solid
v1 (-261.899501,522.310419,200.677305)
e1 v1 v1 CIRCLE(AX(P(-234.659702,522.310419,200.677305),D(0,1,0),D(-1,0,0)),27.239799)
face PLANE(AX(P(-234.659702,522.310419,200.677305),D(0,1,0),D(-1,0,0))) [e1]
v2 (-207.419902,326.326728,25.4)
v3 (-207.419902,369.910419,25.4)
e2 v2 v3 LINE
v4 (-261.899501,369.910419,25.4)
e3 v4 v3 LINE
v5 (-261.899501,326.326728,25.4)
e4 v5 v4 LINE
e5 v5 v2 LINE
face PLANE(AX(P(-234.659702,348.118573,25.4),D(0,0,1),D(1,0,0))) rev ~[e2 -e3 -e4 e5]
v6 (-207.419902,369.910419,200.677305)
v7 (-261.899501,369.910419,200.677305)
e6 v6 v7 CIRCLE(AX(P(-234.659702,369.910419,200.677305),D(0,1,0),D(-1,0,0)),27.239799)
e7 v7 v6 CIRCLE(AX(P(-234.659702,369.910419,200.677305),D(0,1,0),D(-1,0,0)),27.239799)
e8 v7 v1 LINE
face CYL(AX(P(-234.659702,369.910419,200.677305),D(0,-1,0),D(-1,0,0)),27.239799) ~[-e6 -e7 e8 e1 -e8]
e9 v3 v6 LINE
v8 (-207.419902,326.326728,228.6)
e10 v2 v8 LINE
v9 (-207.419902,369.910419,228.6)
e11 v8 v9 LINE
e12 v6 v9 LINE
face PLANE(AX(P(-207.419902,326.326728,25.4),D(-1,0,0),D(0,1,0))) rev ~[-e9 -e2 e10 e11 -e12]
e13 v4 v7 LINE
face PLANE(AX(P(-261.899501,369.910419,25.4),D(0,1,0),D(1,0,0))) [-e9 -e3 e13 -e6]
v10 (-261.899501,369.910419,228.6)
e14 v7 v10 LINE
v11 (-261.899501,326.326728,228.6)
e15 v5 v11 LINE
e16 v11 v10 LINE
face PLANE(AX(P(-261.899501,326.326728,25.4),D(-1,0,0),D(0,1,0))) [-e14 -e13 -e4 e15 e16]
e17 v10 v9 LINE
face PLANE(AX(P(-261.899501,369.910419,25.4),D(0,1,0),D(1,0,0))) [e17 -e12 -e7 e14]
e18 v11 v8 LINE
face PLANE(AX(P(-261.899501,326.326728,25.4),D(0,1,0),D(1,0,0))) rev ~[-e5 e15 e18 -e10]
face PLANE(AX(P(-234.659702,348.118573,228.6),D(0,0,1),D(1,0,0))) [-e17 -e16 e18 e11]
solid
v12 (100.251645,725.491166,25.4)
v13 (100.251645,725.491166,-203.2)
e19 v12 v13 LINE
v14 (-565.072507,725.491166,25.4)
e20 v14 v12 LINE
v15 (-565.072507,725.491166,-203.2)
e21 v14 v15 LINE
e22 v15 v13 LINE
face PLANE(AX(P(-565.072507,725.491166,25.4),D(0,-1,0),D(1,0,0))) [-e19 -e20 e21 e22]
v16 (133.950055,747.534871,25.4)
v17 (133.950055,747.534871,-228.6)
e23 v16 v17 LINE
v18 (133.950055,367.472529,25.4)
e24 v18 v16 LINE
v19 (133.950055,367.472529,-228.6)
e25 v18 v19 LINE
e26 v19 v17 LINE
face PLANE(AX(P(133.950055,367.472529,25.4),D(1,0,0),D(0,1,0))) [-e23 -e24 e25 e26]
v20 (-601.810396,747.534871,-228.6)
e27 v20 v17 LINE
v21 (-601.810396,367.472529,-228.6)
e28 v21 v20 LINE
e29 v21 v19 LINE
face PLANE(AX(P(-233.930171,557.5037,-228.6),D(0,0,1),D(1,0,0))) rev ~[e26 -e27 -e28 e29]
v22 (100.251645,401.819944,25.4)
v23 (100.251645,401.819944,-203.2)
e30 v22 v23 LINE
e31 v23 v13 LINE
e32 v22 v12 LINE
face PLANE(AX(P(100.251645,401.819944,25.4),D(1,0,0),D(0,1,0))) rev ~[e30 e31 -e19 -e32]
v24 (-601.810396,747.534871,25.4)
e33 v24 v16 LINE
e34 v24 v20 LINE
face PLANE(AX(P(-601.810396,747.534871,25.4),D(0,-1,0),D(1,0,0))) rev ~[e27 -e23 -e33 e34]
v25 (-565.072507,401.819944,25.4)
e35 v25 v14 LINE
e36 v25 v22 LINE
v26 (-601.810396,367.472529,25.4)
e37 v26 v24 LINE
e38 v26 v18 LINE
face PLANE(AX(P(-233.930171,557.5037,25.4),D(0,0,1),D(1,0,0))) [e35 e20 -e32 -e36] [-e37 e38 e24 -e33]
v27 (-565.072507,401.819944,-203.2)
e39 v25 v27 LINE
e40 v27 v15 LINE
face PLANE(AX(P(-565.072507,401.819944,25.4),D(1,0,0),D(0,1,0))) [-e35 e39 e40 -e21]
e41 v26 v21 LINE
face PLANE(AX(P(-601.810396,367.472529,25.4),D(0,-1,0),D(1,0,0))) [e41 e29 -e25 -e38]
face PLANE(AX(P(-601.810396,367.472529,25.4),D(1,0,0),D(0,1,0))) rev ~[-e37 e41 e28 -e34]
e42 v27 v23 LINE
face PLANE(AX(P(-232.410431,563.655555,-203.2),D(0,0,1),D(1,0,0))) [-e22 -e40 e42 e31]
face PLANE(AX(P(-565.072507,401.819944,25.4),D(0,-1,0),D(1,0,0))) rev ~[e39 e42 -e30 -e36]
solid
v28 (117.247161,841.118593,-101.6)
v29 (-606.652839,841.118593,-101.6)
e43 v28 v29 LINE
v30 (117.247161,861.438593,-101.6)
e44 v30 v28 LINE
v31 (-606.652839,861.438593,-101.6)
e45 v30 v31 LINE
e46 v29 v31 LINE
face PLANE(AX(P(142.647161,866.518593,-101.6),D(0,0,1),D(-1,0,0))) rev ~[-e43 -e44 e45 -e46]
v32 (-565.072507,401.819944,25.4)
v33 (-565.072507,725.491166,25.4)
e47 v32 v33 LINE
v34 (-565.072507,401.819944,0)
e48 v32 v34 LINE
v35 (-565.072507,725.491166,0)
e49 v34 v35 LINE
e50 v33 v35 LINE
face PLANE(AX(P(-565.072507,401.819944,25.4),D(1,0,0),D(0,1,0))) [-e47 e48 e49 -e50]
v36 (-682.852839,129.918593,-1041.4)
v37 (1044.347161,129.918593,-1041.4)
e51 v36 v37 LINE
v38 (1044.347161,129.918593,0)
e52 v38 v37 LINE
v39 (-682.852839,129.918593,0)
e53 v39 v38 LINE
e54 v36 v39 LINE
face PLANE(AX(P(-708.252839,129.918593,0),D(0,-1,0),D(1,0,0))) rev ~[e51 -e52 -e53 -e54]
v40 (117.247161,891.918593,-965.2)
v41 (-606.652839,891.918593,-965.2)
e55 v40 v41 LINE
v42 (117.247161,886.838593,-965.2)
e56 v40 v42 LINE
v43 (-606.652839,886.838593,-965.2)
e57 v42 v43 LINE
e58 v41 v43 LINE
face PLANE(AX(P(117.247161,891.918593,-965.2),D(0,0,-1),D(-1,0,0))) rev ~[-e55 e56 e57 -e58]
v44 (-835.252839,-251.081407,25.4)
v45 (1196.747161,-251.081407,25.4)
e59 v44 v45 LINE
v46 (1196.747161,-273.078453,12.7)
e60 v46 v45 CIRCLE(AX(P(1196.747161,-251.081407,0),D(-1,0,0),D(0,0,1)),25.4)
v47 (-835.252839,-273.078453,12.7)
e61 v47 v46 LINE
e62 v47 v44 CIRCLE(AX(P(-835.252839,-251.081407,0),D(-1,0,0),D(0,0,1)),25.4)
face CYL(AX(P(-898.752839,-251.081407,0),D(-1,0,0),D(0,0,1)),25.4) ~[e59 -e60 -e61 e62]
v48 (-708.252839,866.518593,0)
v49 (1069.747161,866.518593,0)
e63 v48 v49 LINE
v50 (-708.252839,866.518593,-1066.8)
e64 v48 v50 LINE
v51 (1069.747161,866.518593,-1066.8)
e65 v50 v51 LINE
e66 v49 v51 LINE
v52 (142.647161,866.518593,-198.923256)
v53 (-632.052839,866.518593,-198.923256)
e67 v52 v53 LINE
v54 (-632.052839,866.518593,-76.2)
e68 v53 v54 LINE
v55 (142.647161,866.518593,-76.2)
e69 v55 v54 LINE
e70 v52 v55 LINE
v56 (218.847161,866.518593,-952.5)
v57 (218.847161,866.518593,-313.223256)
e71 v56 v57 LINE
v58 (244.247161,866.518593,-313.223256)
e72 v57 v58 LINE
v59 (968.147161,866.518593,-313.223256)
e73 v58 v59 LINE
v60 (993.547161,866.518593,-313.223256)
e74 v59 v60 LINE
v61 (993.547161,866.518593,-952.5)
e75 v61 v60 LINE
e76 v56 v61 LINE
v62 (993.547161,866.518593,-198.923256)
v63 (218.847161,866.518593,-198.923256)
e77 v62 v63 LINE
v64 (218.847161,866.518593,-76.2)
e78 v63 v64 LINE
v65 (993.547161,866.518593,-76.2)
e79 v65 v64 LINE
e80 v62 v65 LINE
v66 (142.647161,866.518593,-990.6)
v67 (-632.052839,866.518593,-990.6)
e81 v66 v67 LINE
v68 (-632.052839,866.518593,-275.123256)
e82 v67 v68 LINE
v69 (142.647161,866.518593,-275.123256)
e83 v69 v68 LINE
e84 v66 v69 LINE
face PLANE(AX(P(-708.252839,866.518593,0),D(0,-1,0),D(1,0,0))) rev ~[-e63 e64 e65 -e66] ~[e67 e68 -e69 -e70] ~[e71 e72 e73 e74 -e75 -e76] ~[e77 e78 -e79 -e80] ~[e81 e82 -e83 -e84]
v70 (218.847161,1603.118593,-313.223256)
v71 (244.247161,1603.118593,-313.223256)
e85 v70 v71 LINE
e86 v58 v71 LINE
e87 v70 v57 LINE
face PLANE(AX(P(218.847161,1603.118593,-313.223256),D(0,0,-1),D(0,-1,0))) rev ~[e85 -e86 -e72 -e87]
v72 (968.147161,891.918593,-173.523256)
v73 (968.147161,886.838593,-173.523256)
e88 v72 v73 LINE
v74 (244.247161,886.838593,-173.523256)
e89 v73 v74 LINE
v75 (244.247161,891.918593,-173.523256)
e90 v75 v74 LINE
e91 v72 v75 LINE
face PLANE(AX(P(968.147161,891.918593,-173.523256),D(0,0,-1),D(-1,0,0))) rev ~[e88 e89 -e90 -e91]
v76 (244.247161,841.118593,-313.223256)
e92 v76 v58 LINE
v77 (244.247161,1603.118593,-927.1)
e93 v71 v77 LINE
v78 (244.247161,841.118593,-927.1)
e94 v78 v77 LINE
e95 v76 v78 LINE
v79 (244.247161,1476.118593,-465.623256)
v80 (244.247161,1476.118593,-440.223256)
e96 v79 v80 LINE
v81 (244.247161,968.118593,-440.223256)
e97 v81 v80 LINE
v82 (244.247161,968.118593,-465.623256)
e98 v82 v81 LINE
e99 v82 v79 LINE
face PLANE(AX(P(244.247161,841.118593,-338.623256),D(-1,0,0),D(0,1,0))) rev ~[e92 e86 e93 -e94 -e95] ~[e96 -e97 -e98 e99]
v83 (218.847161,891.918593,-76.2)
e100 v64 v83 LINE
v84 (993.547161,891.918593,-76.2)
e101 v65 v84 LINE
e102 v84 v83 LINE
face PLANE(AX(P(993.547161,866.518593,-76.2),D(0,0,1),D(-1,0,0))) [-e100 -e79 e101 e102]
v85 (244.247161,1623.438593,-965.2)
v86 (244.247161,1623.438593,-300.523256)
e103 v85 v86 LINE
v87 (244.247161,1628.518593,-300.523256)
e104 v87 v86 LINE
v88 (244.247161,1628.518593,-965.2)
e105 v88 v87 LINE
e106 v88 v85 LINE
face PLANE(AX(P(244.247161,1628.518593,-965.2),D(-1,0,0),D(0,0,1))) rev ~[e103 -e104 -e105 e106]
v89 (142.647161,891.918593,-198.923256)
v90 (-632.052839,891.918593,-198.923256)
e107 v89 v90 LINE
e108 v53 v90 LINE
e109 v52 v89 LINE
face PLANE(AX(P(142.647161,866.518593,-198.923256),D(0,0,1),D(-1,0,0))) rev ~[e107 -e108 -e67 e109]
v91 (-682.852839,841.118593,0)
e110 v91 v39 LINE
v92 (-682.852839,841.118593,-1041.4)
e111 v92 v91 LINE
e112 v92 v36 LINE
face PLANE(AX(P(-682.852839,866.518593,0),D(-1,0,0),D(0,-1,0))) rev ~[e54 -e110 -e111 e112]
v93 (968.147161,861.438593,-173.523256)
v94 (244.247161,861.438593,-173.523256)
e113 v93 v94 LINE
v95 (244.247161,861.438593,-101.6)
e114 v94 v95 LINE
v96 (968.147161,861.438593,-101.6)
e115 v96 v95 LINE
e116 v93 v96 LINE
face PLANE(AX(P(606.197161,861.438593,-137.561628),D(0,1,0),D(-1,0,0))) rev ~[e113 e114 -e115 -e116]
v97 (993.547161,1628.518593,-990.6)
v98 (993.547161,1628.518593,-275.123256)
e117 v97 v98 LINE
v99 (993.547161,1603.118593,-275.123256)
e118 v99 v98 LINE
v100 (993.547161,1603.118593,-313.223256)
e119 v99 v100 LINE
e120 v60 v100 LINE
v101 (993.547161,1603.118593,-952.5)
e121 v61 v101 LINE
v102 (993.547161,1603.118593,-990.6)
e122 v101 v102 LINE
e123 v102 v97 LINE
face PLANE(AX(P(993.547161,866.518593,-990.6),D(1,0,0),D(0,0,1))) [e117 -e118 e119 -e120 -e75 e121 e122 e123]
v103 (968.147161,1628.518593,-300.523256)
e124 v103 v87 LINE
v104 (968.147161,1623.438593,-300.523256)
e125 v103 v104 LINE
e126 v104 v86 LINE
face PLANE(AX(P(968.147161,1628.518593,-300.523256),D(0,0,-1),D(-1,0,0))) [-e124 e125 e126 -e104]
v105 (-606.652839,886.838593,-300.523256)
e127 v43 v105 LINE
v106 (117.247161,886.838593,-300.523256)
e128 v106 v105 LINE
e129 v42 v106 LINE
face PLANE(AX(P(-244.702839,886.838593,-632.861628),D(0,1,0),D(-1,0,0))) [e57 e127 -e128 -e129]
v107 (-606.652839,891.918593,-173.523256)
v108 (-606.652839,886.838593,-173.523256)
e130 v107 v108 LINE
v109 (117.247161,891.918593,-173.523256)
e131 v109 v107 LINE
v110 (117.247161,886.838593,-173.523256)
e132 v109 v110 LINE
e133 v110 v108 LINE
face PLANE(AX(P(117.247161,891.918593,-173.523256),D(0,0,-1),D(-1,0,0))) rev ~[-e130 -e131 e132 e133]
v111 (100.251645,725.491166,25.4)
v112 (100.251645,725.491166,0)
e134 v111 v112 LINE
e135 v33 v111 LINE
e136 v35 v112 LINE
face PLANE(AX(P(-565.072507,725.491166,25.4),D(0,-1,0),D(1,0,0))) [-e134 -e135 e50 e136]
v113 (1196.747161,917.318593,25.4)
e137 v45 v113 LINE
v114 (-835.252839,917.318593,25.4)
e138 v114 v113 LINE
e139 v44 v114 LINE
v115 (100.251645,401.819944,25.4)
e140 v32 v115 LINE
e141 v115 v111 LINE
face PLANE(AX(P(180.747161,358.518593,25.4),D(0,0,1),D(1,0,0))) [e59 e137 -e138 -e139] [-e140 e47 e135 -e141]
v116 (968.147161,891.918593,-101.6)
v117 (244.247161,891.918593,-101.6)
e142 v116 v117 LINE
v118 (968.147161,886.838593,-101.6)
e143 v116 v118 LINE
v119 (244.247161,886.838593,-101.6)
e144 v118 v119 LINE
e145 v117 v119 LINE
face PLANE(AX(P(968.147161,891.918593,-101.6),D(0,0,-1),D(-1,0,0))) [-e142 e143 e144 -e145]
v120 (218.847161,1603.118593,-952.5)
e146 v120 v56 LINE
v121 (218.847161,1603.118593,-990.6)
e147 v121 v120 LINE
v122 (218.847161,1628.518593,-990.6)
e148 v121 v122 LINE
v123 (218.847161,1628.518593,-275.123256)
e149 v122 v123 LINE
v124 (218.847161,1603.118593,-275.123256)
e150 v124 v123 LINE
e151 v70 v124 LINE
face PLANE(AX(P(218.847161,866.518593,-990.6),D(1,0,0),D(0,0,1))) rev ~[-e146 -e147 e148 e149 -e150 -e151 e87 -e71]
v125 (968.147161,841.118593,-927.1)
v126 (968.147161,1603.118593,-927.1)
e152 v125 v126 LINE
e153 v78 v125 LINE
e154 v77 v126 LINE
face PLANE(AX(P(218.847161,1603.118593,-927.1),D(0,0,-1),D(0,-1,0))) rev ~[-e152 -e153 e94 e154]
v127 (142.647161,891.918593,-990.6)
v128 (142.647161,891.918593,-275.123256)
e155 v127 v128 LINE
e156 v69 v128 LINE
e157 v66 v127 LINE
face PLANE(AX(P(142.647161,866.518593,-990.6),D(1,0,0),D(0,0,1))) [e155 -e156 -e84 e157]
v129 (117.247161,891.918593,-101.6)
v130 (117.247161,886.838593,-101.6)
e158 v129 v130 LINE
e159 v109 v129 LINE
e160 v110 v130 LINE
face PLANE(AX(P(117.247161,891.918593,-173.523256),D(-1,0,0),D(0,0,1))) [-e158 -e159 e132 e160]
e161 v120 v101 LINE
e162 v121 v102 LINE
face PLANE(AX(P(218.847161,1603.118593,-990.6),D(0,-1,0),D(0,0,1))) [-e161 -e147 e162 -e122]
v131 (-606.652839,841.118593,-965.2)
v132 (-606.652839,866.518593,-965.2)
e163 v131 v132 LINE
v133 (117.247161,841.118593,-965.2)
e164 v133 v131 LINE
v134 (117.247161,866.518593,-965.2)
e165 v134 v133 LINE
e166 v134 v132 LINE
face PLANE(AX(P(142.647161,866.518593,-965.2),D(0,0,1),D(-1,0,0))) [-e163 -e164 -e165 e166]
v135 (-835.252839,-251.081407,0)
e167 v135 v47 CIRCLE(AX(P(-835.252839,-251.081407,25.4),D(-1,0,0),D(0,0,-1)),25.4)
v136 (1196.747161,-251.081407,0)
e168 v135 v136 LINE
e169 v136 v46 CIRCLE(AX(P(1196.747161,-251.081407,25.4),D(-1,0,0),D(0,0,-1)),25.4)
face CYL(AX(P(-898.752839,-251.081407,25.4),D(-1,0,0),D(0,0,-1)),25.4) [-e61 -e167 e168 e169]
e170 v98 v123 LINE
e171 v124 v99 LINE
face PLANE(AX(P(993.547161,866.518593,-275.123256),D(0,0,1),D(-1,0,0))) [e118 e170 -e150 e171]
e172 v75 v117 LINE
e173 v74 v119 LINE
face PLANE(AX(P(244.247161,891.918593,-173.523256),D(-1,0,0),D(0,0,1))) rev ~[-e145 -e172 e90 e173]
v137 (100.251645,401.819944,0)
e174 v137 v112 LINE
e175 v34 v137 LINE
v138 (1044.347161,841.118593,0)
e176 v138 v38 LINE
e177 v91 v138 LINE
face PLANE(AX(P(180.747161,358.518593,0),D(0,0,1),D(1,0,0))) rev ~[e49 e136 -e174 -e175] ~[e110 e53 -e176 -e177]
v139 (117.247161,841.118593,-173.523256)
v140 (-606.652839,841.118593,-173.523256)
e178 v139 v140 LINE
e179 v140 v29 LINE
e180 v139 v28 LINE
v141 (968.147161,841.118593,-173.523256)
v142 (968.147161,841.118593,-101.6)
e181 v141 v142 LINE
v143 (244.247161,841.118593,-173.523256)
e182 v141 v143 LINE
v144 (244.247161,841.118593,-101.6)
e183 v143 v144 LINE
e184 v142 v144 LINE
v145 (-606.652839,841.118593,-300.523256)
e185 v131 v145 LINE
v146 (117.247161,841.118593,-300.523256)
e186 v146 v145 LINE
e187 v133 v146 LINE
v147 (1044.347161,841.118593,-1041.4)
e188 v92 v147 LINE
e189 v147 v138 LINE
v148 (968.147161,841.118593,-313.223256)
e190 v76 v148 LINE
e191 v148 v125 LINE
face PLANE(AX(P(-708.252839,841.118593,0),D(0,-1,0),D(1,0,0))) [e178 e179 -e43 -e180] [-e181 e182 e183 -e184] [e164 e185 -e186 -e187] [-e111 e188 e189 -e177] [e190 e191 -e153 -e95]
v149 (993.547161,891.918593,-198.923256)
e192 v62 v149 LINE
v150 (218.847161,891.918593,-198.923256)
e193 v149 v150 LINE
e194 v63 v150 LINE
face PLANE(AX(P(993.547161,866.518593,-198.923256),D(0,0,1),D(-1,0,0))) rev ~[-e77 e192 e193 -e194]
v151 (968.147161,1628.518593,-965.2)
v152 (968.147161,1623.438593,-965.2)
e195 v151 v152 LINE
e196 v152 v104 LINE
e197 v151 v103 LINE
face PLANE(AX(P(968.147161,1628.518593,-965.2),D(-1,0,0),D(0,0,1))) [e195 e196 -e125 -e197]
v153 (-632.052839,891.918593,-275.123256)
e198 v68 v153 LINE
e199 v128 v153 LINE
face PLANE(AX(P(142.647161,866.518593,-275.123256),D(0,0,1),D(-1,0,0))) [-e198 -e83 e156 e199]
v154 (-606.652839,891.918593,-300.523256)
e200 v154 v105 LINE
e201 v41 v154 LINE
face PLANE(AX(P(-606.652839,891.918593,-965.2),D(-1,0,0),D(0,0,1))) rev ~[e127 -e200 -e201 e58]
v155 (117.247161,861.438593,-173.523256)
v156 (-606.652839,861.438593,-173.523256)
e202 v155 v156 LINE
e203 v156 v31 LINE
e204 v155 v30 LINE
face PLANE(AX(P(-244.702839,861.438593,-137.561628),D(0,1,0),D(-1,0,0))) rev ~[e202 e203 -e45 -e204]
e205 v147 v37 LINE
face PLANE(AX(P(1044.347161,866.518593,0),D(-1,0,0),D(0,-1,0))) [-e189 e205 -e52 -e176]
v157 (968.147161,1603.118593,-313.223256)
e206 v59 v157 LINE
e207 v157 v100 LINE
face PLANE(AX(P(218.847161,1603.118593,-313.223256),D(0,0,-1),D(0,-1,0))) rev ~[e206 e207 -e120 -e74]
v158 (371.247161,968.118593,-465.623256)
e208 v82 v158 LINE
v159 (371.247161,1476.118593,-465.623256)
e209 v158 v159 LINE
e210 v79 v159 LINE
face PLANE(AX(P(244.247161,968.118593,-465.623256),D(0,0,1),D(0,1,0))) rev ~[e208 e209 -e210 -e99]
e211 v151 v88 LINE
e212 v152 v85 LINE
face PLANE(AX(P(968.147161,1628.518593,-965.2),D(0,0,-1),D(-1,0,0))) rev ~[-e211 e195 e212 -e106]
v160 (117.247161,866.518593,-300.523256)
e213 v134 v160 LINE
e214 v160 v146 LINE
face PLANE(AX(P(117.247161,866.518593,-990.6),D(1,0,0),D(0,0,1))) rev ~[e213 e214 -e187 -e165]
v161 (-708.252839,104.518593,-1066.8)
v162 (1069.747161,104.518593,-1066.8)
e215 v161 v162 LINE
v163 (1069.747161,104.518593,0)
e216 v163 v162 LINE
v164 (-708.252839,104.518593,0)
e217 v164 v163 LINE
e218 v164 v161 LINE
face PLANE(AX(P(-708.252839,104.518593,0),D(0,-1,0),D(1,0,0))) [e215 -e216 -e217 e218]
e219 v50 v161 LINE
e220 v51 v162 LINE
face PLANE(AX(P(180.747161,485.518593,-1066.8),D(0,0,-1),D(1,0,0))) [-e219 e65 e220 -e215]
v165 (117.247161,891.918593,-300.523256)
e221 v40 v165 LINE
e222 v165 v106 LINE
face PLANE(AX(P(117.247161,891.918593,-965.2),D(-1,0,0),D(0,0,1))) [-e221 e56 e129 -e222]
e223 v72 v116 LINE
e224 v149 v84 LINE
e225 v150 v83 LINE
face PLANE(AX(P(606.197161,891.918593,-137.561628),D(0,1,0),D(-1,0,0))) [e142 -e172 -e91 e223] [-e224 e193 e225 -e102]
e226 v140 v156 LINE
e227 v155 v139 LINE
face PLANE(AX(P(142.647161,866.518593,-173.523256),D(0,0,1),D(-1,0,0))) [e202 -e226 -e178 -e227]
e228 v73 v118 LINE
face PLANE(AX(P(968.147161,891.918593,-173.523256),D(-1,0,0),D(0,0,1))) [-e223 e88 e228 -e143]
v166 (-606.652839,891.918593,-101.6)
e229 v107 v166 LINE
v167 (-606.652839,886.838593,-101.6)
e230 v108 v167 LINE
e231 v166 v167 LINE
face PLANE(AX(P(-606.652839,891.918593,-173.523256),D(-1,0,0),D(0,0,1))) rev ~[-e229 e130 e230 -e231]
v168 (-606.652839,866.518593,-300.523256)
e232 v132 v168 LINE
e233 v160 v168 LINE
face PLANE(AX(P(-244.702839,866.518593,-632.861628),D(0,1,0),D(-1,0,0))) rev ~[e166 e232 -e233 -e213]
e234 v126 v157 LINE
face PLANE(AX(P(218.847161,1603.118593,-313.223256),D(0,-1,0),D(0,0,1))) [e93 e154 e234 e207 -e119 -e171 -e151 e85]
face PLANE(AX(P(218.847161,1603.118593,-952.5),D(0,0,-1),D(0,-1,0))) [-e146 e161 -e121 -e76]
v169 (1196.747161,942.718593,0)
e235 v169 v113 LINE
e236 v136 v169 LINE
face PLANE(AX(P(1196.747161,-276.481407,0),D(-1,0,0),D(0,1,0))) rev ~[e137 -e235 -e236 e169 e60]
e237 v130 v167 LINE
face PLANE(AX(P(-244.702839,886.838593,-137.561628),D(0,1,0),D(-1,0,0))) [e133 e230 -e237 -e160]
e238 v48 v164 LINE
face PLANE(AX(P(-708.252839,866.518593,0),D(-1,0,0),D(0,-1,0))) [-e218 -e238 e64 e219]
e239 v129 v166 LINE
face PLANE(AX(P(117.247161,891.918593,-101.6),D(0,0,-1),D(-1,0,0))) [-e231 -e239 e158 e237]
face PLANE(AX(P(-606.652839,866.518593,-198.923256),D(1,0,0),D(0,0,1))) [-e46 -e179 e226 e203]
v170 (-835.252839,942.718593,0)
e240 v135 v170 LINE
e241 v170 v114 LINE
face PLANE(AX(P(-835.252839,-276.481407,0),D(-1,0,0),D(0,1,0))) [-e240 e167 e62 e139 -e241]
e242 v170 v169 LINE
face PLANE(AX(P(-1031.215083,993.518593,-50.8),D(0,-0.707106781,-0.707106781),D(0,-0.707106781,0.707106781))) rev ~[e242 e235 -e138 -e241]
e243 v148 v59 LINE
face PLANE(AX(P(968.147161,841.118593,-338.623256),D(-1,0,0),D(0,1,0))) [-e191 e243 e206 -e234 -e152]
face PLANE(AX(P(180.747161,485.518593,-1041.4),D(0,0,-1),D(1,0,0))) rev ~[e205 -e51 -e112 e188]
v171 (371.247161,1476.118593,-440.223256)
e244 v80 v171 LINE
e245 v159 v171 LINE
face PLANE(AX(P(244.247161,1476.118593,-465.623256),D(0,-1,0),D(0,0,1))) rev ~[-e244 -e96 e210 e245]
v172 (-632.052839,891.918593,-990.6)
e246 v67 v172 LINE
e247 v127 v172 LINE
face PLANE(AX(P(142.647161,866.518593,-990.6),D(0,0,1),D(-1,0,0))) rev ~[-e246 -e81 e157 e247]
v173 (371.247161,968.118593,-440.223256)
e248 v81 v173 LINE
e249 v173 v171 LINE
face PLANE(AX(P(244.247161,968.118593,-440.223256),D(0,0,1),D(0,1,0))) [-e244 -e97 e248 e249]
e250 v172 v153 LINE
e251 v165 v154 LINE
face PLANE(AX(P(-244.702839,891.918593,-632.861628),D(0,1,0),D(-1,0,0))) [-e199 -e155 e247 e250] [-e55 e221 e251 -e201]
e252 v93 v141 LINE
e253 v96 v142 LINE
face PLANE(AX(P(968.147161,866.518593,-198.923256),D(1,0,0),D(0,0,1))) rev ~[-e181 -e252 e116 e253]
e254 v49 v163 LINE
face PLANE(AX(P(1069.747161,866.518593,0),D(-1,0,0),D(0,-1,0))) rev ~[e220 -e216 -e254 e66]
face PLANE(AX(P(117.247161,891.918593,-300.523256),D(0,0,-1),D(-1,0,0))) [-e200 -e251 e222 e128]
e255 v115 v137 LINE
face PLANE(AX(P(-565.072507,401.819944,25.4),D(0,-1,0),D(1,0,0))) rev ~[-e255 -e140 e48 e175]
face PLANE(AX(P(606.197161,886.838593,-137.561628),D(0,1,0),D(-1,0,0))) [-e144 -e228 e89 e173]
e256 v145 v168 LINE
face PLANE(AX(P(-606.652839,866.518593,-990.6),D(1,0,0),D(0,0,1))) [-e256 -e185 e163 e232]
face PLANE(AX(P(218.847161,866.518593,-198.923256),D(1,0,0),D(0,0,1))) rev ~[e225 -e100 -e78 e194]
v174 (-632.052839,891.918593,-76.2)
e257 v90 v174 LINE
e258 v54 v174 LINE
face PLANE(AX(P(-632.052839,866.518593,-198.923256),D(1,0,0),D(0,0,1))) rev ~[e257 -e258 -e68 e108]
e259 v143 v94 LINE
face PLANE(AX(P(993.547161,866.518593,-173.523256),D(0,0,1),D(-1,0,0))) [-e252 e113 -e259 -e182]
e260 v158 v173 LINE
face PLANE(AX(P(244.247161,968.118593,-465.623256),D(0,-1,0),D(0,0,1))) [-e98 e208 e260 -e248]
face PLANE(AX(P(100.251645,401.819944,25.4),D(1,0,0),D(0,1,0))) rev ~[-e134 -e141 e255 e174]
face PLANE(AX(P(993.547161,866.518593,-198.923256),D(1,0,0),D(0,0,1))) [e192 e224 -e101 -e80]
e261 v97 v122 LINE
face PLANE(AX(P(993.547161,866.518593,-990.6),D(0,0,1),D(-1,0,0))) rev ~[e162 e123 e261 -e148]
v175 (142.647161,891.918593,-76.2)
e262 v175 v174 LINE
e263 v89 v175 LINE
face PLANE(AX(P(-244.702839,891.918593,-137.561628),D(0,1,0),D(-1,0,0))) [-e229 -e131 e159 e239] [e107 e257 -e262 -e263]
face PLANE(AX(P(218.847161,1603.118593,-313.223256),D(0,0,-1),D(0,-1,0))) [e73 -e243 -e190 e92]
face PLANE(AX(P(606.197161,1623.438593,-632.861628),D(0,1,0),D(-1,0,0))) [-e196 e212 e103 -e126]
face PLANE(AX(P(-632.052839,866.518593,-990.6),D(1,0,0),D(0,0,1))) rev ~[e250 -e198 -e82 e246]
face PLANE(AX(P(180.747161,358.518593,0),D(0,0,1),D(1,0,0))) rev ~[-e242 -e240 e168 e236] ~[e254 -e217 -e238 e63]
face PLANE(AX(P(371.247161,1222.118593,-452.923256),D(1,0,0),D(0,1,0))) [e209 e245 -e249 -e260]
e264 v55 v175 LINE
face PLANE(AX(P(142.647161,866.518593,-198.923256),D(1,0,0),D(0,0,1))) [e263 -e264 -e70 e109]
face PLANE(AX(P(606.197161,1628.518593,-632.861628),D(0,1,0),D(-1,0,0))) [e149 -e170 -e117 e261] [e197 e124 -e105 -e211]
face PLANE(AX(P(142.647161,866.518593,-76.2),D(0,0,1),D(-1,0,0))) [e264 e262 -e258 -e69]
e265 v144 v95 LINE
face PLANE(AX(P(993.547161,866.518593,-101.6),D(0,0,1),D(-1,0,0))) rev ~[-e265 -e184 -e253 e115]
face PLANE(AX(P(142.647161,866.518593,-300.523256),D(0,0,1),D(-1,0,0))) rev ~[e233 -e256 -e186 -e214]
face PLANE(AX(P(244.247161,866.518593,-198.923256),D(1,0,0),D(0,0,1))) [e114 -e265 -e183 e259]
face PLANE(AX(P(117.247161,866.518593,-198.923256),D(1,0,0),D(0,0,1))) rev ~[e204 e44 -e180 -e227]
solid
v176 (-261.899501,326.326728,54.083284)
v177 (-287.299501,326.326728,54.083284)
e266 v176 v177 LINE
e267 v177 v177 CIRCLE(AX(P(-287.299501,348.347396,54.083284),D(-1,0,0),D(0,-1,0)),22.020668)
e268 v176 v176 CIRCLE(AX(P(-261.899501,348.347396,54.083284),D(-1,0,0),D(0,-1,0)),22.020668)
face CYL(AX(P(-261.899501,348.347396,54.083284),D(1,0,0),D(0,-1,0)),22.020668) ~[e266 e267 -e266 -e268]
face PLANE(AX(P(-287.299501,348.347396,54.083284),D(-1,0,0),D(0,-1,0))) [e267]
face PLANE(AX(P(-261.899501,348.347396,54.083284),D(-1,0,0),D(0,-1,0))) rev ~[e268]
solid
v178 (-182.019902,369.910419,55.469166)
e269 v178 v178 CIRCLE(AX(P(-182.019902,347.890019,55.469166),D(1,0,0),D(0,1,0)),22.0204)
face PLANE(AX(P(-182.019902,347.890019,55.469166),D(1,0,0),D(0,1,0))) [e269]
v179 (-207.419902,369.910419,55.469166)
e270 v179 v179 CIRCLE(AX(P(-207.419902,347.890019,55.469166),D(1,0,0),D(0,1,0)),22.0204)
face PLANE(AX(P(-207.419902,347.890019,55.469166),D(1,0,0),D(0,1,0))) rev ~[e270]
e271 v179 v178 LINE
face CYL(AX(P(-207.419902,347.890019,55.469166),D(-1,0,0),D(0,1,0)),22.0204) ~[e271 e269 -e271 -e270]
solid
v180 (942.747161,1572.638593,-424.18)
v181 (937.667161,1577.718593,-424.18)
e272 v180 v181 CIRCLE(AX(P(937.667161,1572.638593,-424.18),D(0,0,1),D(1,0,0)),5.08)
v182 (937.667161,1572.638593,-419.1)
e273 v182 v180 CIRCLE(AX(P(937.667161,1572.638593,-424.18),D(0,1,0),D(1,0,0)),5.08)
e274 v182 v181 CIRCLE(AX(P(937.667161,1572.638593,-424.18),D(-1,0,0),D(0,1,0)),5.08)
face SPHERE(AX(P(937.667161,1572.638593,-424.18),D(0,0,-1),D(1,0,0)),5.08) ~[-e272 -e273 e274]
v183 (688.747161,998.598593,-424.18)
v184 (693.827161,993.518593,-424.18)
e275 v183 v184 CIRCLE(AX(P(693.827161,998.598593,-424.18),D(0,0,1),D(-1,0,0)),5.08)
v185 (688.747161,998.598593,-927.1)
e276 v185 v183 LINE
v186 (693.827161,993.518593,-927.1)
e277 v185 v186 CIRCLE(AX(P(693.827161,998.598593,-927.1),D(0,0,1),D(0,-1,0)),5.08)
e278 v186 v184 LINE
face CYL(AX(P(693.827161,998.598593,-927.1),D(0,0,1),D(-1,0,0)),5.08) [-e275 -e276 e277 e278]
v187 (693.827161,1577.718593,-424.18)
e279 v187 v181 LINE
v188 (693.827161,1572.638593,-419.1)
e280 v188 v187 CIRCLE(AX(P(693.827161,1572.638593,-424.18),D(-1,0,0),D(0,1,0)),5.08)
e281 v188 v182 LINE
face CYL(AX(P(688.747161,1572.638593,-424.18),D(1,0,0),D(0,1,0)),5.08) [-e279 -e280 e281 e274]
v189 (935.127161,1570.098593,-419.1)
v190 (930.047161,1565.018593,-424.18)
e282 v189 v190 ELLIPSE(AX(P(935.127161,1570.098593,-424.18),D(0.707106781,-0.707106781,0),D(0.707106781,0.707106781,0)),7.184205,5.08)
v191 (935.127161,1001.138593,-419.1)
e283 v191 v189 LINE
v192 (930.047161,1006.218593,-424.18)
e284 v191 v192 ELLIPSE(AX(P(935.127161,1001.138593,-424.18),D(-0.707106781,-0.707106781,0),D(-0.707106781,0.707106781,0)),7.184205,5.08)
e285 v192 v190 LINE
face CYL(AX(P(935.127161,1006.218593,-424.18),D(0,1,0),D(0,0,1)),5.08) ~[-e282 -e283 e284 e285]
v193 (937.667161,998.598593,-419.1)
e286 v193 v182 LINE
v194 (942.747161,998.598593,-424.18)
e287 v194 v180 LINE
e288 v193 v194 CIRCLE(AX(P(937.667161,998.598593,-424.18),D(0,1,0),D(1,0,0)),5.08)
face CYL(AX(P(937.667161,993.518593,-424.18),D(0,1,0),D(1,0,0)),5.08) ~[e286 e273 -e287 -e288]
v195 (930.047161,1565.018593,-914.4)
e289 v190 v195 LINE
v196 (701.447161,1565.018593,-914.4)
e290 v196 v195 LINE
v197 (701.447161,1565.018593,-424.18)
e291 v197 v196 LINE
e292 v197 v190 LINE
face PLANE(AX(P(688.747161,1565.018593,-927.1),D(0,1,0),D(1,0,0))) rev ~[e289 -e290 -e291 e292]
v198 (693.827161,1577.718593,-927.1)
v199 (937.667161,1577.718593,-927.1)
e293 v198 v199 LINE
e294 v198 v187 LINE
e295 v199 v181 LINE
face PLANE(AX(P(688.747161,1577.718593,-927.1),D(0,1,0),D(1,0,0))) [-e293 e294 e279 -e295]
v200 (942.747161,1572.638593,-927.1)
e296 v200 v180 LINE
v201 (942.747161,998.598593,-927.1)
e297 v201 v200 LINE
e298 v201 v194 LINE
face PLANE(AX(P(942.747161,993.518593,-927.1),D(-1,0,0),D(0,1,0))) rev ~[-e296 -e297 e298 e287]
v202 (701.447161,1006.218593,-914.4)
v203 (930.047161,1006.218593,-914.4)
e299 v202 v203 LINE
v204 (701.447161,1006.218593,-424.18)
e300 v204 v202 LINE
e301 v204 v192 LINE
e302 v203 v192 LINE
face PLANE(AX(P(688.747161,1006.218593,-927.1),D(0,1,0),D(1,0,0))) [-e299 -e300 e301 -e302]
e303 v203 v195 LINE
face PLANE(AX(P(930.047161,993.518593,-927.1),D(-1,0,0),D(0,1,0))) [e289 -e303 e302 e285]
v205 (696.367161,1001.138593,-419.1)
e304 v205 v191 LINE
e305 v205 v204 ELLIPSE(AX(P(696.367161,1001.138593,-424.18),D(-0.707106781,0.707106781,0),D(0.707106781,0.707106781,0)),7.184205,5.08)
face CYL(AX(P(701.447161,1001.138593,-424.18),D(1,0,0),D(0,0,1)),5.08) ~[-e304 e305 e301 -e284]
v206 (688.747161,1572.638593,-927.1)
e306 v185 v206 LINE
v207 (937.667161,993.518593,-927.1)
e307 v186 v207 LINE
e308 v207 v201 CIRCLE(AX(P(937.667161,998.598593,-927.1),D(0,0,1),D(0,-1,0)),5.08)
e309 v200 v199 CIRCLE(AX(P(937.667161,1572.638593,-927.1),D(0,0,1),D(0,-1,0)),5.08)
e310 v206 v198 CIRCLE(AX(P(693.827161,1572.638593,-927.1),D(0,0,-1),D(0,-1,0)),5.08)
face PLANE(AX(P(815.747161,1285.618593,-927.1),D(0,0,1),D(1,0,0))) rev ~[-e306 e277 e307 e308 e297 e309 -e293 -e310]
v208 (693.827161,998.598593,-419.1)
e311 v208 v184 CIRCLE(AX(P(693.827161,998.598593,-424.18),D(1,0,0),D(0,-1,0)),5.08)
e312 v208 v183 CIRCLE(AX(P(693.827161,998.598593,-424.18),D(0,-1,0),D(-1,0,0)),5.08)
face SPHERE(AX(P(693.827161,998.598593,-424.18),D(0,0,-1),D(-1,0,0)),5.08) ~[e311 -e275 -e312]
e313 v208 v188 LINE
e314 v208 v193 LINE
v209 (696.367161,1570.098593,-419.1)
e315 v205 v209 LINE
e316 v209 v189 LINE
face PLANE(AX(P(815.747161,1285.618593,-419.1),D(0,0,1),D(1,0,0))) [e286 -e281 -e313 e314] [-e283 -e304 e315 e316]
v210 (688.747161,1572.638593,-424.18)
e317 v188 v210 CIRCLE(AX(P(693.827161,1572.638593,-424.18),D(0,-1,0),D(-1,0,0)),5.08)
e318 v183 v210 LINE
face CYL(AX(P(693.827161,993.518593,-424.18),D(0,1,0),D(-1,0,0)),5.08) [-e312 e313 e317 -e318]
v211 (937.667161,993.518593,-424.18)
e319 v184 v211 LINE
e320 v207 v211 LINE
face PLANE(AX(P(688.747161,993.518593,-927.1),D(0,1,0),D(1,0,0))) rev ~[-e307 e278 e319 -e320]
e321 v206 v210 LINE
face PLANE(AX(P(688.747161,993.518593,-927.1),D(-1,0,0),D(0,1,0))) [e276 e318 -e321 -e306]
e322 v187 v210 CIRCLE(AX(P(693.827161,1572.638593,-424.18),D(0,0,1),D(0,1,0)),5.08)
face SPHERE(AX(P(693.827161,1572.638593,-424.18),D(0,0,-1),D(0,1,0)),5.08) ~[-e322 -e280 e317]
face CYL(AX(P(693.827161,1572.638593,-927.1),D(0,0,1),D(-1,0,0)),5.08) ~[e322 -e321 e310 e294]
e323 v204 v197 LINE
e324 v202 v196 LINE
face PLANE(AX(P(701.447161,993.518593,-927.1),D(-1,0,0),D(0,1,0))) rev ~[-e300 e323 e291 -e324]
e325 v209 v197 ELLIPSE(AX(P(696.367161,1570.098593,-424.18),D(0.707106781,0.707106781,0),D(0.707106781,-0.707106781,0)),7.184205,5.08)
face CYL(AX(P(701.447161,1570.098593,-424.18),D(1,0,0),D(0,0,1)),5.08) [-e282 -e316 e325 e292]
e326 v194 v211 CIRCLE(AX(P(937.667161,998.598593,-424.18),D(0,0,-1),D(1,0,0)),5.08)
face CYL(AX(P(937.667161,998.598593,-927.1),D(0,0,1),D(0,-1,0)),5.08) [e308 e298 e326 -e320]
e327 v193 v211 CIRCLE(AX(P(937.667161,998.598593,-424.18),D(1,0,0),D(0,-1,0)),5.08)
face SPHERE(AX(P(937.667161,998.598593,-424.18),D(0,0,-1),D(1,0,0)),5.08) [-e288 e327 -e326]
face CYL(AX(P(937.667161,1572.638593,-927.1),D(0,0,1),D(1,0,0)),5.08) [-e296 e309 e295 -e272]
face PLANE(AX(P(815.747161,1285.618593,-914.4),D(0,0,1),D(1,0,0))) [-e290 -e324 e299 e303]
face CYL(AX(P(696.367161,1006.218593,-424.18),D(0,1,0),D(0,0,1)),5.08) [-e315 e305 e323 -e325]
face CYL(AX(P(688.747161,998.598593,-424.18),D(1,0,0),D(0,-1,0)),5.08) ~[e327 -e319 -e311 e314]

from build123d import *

# Parameters (mm, degrees)
F0_W         = 2032
F0_H         = 1270
F1_DEPTH     = 25.4
F2_W         = 1778
F2_H         = 762
F3_DEPTH     = 1066.8
F4_W         = 774.7
F4_H         = 122.7232557205
F5_DEPTH     = 25.4
F6_W         = 723.9
F6_H         = 71.9232557205
F7_DEPTH     = 5.08
F8_W         = 774.7
F8_H         = 715.4767442795
F9_DEPTH     = 25.4
F10_DEPTH    = 762
F11_W        = 736.6
F11_H        = 38.1
F12_DEPTH    = 787.4
F13_T        = -25.4
F14_W        = 723.9
F14_H        = 664.6767442795
F15_DEPTH    = 5.08
F16_W        = 723.9
F16_H        = 664.6767442795
F17_DEPTH    = 5.08
F18_T1_DEPTH = 2159
F19_T1_DEPTH = 2423.924487366
F20_W        = 508
F20_H        = 25.4
F21_DEPTH    = 127
F23_W        = 254
F23_H        = 584.2
F24_DEPTH    = 508
F25_T        = -12.7
F26_R        = 5.08
F27_W        = 735.7604503632
F27_H        = 380.0623416901
F28_DEPTH    = 254
F29_W        = 665.324151516
F29_H        = 323.6712217331
F30_DEPTH    = 228.6
F31_W        = 54.479598999
F31_H        = 43.5836911201
F32_DEPTH    = 203.2
F33_R        = 27.2397994995
F34_DEPTH    = 152.4
F35_R        = 22.0206677914
F36_DEPTH    = 25.4
F37_R        = 22.0203995705
F38_DEPTH    = 25.4


# Not quite as in the source:
# - a fillet or chamfer that OpenCascade refuses, or shapes differently, is made with other operations: its cross-section is extruded or revolved along the edge and cut away or added
# - a shell that OpenCascade refuses in one call is made with other operations: the cavity is built on its own and cut out


with BuildPart() as f1:
    # F0 (on Top) → F1 (new body)
    with BuildSketch(Plane.XY):
        with Locations((180.7471609741, 358.5185925256)):
            Rectangle(F0_W, F0_H)
    extrude(amount=F1_DEPTH)

    # F2 (on face) → F3 (join)
    with BuildSketch(Plane(origin=(0, 0, 0), x_dir=(1, 0, 0), z_dir=(0, 0, -1))):
        with Locations((180.7471609741, -485.5185925256)):
            Rectangle(F2_W, F2_H)
    extrude(amount=F3_DEPTH)

    # F4 (on face) → F5 (join)
    with BuildSketch(Plane(origin=(0, 866.5185925256, 0), x_dir=(-1, 0, 0), z_dir=(0, 1, 0))):
        with Locations((-606.1971609741, -137.5616278603)):
            Rectangle(F4_W, F4_H)
        with Locations((244.7028390259, -137.5616278603)):
            Rectangle(F4_W, F4_H)
    extrude(amount=F5_DEPTH)

    # F6 (on face) → F7 (cut)
    with BuildSketch(Plane(origin=(0, 891.9185925256, 0), x_dir=(-1, 0, 0), z_dir=(0, 1, 0))):
        with Locations((-606.1971609741, -137.5616278603)):
            Rectangle(F6_W, F6_H)
        with Locations((244.7028390259, -137.5616278603)):
            Rectangle(F6_W, F6_H)
    extrude(amount=-F7_DEPTH, mode=Mode.SUBTRACT)

    # F8 (on face) → F9 (join)
    with BuildSketch(Plane(origin=(0, 866.5185925256, 0), x_dir=(-1, 0, 0), z_dir=(0, 1, 0))):
        with Locations((244.7028390259, -632.8616278603)):
            Rectangle(F8_W, F8_H)
    extrude(amount=F9_DEPTH)

    # F8 (on face) → F10 (join)
    with BuildSketch(Plane(origin=(0, 866.5185925256, 0), x_dir=(-1, 0, 0), z_dir=(0, 1, 0))):
        with Locations((-606.1971609741, -632.8616278603)):
            Rectangle(F8_W, F8_H)
    extrude(amount=F10_DEPTH)

    # F11 (on face) → F12 (cut)
    with BuildSketch(Plane(origin=(218.8471609741, 0, 0), x_dir=(0, -1, 0), z_dir=(-1, 0, 0))):
        with Locations((-1234.8185925256, -294.1732557205)):
            Rectangle(F11_W, F11_H)
        with Locations((-1234.8185925256, -971.55)):
            Rectangle(F11_W, F11_H)
    extrude(amount=-F12_DEPTH, mode=Mode.SUBTRACT)

    # F13: a shell. OpenCascade refuses it in one call, so the cavity is built on its own and cut out:
    # the body offset inwards by the wall thickness, plus a prism from it out through each open face.
    f13_core = offset(f1.part, amount=F13_T, kind=Kind.INTERSECTION, mode=Mode.PRIVATE)
    f13_exits = [f13_core.faces().sort_by_distance(p)[0] for p in [
        (606.197161, 1222.118593, -338.623256),
    ]]
    add(f13_core, mode=Mode.SUBTRACT)
    extrude(f13_exits, amount=-F13_T, mode=Mode.SUBTRACT)

    # F14 (on face) → F15 (cut)
    with BuildSketch(Plane(origin=(0, 891.9185925256, 0), x_dir=(-1, 0, 0), z_dir=(0, 1, 0))):
        with Locations((244.7028390259, -632.8616278603)):
            Rectangle(F14_W, F14_H)
    extrude(amount=-F15_DEPTH, mode=Mode.SUBTRACT)

    # F16 (on face) → F17 (cut)
    with BuildSketch(Plane(origin=(0, 1628.5185925256, 0), x_dir=(-1, 0, 0), z_dir=(0, 1, 0))):
        with Locations((-606.1971609741, -632.8616278603)):
            Rectangle(F16_W, F16_H)
    extrude(amount=-F17_DEPTH, mode=Mode.SUBTRACT)

    # F18: fillet of radius 25.4 on 2 edges, made by hand

    # F18_s2 → F18_t1 (cut)
    with BuildSketch(Plane.YZ.offset(-898.7528390259)):
        with BuildLine():
            ThreePointArc((-251.0814074744, 25.4), (-269.0419197166, 17.9605122421), (-276.4814074744, 0))
            Line((-276.4814074744, 0), (-276.4814074744, 25.4))
            Line((-276.4814074744, 25.4), (-251.0814074744, 25.4))
        make_face()
        with BuildLine():
            ThreePointArc((-251.0814074744, 0), (-269.0419197166, 7.4394877579), (-276.4814074744, 25.4))
            Line((-276.4814074744, 25.4), (-276.4814074744, 0))
            Line((-276.4814074744, 0), (-251.0814074744, 0))
        make_face()
    extrude(amount=F18_T1_DEPTH, mode=Mode.SUBTRACT)

    # F19: chamfer of 76.2 on 1 edges, made by hand

    # F19_s2 → F19_t1 (cut)
    with BuildSketch(Plane.YZ.offset(-1031.2150827089)):
        Polygon((993.5185925256, -50.8), (917.3185925256, 25.4), (993.5185925256, 25.4), align=None)
    extrude(amount=F19_T1_DEPTH, mode=Mode.SUBTRACT)

    # F20 (on face) → F21 (join)
    with BuildSketch(Plane.YZ.offset(244.2471609741)):
        with Locations((1222.1185925256, -452.9232557205)):
            Rectangle(F20_W, F20_H)
    extrude(amount=F21_DEPTH)


with BuildPart() as f24:
    # F23 (on offset) → F24 (new body)
    with BuildSketch(Plane.XY.offset(-927.1)):
        with Locations((815.7471609741, 1285.6185925256)):
            Rectangle(F23_W, F23_H)
    extrude(amount=F24_DEPTH)

    # F25
    f25_openings = [f24.faces().sort_by_distance(p)[0] for p in [
        (815.747161, 1285.618593, -419.1),
    ]]
    offset(amount=F25_T, openings=f25_openings)

    # F26
    f26_edges = [f24.edges().sort_by_distance(p)[0] for p in [
        (688.747161, 1577.718593, -673.1),
        (942.747161, 1577.718593, -673.1),
        (688.747161, 993.518593, -673.1),
        (942.747161, 993.518593, -673.1),
        (942.747161, 1285.618593, -419.1),
        (930.047161, 1285.618593, -419.1),
        (815.747161, 1577.718593, -419.1),
        (815.747161, 1565.018593, -419.1),
        (701.447161, 1285.618593, -419.1),
        (688.747161, 1285.618593, -419.1),
        (815.747161, 1006.218593, -419.1),
        (815.747161, 993.518593, -419.1),
    ]]
    fillet(f26_edges, radius=F26_R)


with BuildPart() as f28:
    # F27 (on face) → F28 (new body)
    with BuildSketch(Plane.XY.offset(25.4)):
        with Locations((-233.930170536, 557.5037002563)):
            Rectangle(F27_W, F27_H)
    extrude(amount=-F28_DEPTH)


with BuildPart() as f30_tool:
    # F29 (on face) → F30 (new body)
    with BuildSketch(Plane.XY.offset(25.4)):
        with Locations((-232.4104309082, 563.6555552483)):
            Rectangle(F29_W, F29_H)
    extrude(amount=-F30_DEPTH)


with BuildPart() as f1_1:
    add(f1.part)

    # F30: cut by f30_tool
    add(f30_tool.part, mode=Mode.SUBTRACT)


with BuildPart() as f28_1:
    add(f28.part)

    # F30: cut by f30_tool
    add(f30_tool.part, mode=Mode.SUBTRACT)


with BuildPart() as f32:
    # F31 (on face) → F32 (new body)
    with BuildSketch(Plane.XY.offset(25.4)):
        with Locations((-234.6597015858, 348.1185734272)):
            Rectangle(F31_W, F31_H)
    extrude(amount=F32_DEPTH)

    # F33 (on face) → F34 (join)
    with BuildSketch(Plane(origin=(0, 369.9104189873, 0), x_dir=(-1, 0, 0), z_dir=(0, 1, 0))):
        with Locations((234.6597015858, 200.67730546)):
            Circle(F33_R)
    extrude(amount=F34_DEPTH)


with BuildPart() as f36:
    # F35 (on face) → F36 (new body)
    with BuildSketch(Plane(origin=(-261.8995010853, 0, 0), x_dir=(0, -1, 0), z_dir=(-1, 0, 0))):
        with Locations((-348.3473956585, 54.0832839906)):
            Circle(F35_R)
    extrude(amount=F36_DEPTH)


with BuildPart() as f38:
    # F37 (on face) → F38 (new body)
    with BuildSketch(Plane.YZ.offset(-207.4199020863)):
        with Locations((347.8900194168, 55.4691664875)):
            Circle(F37_R)
    extrude(amount=F38_DEPTH)


solid = Compound([f24.part, f1_1.part, f28_1.part, f32.part, f36.part, f38.part])
